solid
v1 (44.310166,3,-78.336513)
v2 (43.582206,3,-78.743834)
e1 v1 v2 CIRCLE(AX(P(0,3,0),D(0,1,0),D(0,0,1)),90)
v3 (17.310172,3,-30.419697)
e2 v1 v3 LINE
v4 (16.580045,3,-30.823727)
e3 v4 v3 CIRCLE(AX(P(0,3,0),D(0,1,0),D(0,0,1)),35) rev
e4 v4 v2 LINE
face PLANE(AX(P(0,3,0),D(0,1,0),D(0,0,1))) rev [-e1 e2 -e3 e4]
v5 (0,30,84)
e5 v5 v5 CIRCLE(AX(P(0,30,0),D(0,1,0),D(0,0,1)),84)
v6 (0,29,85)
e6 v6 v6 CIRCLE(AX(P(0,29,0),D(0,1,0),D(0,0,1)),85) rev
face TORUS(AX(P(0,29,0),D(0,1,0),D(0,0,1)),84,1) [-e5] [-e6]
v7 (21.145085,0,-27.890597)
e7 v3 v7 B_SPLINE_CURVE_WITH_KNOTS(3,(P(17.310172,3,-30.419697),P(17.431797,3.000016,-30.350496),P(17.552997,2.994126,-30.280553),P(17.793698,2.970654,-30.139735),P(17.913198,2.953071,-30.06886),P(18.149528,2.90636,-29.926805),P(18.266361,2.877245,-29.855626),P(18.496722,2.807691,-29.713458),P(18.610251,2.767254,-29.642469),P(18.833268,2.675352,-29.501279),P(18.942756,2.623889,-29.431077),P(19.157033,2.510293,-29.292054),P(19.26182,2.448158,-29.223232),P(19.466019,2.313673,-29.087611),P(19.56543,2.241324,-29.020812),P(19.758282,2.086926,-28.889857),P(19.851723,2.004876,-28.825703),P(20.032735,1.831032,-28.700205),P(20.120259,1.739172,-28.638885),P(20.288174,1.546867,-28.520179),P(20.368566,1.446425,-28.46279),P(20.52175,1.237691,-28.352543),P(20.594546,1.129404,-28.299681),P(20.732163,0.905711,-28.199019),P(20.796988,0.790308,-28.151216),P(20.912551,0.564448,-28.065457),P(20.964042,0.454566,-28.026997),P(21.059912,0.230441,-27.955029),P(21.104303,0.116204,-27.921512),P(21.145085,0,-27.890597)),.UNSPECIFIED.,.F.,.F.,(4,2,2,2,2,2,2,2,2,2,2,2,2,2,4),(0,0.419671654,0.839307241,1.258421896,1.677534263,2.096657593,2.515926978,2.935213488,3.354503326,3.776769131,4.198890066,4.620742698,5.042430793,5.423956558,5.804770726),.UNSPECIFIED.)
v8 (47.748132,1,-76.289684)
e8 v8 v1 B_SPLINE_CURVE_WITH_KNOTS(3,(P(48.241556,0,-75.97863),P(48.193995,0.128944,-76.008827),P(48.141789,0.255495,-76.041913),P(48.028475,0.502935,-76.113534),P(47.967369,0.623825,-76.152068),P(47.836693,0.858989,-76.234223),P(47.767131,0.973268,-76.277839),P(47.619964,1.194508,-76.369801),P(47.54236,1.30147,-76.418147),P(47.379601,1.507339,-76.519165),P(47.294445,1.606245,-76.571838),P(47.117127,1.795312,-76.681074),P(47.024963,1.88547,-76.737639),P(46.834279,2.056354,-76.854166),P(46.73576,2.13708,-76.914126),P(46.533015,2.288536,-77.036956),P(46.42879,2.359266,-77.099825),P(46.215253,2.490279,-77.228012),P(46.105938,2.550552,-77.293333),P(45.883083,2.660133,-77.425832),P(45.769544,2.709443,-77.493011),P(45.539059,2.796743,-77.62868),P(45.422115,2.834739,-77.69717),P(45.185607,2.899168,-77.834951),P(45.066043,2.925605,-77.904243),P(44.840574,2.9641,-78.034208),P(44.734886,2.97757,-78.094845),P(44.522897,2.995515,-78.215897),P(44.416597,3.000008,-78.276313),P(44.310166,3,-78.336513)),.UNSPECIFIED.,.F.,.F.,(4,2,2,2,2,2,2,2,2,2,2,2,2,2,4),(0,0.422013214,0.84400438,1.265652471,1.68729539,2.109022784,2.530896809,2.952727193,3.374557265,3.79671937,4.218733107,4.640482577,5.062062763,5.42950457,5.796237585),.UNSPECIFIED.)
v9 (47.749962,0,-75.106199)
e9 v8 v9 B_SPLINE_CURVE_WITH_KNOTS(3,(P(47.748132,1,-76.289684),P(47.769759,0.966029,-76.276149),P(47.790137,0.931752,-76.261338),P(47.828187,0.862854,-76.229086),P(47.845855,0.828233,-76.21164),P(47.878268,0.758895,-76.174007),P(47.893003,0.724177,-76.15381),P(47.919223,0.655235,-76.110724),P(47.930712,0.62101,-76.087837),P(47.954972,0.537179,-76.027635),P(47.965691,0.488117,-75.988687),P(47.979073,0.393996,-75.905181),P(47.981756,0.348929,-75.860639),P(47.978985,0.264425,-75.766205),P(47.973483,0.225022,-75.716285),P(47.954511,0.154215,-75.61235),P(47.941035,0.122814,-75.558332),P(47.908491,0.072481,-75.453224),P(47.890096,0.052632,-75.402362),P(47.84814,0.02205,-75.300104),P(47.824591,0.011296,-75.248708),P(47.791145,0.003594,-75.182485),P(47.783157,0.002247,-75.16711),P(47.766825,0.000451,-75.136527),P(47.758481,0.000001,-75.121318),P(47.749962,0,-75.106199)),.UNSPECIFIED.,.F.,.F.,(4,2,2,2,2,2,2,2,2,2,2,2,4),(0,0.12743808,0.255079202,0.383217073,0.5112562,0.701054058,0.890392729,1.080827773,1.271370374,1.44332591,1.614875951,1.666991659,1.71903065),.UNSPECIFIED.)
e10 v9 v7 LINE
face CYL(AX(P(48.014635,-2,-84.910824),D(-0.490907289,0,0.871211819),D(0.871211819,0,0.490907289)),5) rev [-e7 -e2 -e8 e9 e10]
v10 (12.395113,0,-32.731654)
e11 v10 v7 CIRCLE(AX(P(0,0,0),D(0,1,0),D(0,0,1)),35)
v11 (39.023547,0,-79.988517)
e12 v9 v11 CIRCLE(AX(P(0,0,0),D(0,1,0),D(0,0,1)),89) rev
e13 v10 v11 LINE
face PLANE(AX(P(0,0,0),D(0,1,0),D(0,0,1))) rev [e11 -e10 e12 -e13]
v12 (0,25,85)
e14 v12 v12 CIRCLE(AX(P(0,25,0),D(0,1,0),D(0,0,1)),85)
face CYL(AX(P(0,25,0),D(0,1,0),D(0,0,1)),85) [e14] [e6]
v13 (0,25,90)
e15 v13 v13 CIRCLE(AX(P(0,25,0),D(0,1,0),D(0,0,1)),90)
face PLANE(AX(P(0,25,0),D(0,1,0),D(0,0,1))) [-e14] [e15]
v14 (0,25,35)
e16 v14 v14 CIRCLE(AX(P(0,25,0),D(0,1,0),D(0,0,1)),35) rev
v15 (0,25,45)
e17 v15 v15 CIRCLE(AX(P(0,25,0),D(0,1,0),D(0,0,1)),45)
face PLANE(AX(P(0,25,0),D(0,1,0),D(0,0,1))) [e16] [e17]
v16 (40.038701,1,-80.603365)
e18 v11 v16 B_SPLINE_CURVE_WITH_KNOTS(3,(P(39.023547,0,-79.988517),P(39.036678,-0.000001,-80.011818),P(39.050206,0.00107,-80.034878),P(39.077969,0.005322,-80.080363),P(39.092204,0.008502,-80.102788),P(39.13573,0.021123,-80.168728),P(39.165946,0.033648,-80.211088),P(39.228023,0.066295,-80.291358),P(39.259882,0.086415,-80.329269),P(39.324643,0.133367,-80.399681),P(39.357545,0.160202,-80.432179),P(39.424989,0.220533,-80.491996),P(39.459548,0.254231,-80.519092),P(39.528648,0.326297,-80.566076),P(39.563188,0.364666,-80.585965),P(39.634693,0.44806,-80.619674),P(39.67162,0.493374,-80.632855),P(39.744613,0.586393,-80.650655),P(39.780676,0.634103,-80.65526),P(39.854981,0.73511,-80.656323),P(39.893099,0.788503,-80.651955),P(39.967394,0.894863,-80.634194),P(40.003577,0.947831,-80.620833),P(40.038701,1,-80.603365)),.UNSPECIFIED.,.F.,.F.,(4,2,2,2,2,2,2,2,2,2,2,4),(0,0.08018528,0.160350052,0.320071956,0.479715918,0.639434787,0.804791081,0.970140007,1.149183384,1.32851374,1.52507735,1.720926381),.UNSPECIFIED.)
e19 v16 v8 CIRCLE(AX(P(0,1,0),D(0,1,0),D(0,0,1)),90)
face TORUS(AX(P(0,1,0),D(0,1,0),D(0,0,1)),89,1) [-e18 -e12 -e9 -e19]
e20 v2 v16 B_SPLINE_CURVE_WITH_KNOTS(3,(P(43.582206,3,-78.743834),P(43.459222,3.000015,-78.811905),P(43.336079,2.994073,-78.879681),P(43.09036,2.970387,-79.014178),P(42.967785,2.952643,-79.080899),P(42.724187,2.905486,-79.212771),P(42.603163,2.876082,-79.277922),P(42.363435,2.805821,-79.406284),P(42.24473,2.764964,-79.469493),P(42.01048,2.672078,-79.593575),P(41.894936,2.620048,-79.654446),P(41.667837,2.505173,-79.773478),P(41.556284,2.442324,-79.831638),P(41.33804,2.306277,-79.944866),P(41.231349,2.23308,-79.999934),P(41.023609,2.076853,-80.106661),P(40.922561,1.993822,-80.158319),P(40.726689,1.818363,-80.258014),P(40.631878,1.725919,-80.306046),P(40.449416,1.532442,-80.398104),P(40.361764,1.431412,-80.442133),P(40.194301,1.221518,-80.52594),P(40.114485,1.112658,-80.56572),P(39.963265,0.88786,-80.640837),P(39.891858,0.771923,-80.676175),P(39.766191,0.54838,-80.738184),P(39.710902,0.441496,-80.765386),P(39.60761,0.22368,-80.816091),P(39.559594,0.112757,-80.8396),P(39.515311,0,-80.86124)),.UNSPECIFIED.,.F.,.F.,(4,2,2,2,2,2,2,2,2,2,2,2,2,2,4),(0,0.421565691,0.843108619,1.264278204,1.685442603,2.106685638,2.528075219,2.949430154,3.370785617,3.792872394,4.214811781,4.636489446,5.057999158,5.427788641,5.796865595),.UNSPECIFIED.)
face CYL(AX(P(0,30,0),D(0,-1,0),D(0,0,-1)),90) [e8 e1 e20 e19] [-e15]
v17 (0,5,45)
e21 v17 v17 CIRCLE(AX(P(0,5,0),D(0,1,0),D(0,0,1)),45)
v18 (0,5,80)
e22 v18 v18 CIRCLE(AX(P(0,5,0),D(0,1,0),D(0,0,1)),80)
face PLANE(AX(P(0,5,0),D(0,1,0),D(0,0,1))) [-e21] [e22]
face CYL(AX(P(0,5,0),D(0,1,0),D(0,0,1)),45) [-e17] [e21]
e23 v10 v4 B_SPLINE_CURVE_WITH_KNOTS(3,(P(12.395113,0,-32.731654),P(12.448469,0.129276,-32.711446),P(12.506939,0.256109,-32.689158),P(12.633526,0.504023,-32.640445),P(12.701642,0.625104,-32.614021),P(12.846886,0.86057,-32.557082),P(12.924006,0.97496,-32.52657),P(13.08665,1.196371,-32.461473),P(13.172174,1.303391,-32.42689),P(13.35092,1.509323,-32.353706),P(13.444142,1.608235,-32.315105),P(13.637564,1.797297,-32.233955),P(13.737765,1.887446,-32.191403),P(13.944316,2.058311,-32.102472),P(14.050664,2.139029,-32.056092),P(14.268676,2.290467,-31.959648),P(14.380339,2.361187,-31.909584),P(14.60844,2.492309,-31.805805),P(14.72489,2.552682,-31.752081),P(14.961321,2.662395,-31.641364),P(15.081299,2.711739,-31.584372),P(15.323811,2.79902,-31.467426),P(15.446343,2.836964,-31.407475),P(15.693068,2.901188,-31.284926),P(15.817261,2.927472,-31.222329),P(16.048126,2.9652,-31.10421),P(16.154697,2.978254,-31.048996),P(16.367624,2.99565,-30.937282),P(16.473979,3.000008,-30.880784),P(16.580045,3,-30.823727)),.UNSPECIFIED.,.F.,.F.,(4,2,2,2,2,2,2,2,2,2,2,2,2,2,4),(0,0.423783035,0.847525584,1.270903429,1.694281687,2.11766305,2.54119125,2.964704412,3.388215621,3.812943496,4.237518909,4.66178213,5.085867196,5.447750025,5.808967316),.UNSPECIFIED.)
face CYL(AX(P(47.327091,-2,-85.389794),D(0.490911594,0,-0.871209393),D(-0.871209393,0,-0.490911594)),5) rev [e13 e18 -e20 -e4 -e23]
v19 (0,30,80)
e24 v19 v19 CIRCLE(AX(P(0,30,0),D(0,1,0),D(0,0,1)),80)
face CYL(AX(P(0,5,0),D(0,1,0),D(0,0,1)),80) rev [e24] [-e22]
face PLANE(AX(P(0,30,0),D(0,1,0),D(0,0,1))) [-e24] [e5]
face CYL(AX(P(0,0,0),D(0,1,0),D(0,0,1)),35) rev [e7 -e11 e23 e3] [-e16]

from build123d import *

# Parameters (mm, degrees)
SKETCH1_R           = 90
BOSS_EXTRUDE1_DEPTH = 30
SKETCH2_R           = 80
SKETCH2_R_2         = 45
CUT_EXTRUDE2_DEPTH  = 25
SKETCH3_R           = 35
CUT_EXTRUDE3_DEPTH  = 30
CUT_EXTRUDE6_START  = -5
SKETCH4_R           = 90
SKETCH4_R_2         = 85
CUT_EXTRUDE6_DEPTH  = 5
CUT_EXTRUDE7_DEPTH  = 3
FILLET4_R           = 5
FILLET5_R           = 5
FILLET7_R           = 1
SKETCH8_R           = 45
CUT_EXTRUDE8_DEPTH  = 5


with BuildPart() as part:
    # Sketch1 → Boss-Extrude1 (new body)
    with BuildSketch(Plane(origin=(0, 0, 0), x_dir=(1, 0, 0), z_dir=(0, 1, 0))):
        with Locations(Location((0, 0, 0), (0, 0, 270))):
            Circle(SKETCH1_R)
    extrude(amount=BOSS_EXTRUDE1_DEPTH)

    # Sketch2 → Cut-Extrude2 (cut)
    with BuildSketch(Plane(origin=(0, 30, 0), x_dir=(1, 0, 0), z_dir=(0, 1, 0))):
        with Locations(Location((0, 0, 0), (0, 0, 270))):
            Circle(SKETCH2_R)
        with Locations(Location((0, 0, 0), (0, 0, 270))):
            Circle(SKETCH2_R_2, mode=Mode.SUBTRACT)
    extrude(amount=-CUT_EXTRUDE2_DEPTH, mode=Mode.SUBTRACT)

    # Sketch3 → Cut-Extrude3 (cut)
    with BuildSketch(Plane(origin=(0, 30, 0), x_dir=(1, 0, 0), z_dir=(0, 1, 0))):
        with Locations(Location((0, 0, 0), (0, 0, 270))):
            Circle(SKETCH3_R)
    extrude(amount=-CUT_EXTRUDE3_DEPTH, mode=Mode.SUBTRACT)

    # Sketch4 → Cut-Extrude6 (cut)
    with BuildSketch(Plane(origin=(0, 30, 0), x_dir=(1, 0, 0), z_dir=(0, 1, 0)).offset(CUT_EXTRUDE6_START)):
        with Locations(Location((0, 0, 0), (0, 0, 270))):
            Circle(SKETCH4_R)
        with Locations(Location((0, 0, 0), (0, 0, 270))):
            Circle(SKETCH4_R_2, mode=Mode.SUBTRACT)
    extrude(amount=CUT_EXTRUDE6_DEPTH, mode=Mode.SUBTRACT)

    # Sketch7 → Cut-Extrude7 (cut)
    with BuildSketch(Plane(origin=(0, 0, 0), x_dir=(-1, 0, 0), z_dir=(0, -1, 0))):
        Polygon((-43.33470773, 87.639434023), (16.290699143, -18.176389433), (7.60290089, -23.128375045), (-52.007029161, 82.661204336), align=None)
    extrude(amount=-CUT_EXTRUDE7_DEPTH, mode=Mode.SUBTRACT)

    # Fillet4
    # the kernel refuses this fillet: 5 mm, written as the material it adds along each edge
    with BuildSketch(Plane(origin=(15.521035458, 3, -17.909611373), x_dir=(0, -1, 0), z_dir=(0.490907288805725, 0, -0.871211819133219))) as fillet4_piece_1_section:
        with BuildLine():
            CenterArc((5, 4.582575695), FILLET4_R, 180, 66.421821522)
            Line((0, 4.582575695), (-0.1, 4.582575695))
            Line((-0.1, 4.582575695), (-0.1, 0))
            Line((-0.1, 0), (0, -0.1))
            ThreePointArc((0, -0.1), (1.5, -0.1), (2.96, -0.091651514))
            Line((2.96, -0.091651514), (3, 0))
        make_face()
    fillet4_piece_1 = extrude(amount=78.109596927, mode=Mode.PRIVATE)
    fillet4_piece_1 = fillet4_piece_1 & Plane(origin=(0, 3, 0), x_dir=(0, 0, 1), z_dir=(0, -1, 0)) * Cylinder(90, 175, mode=Mode.PRIVATE)
    fillet4_piece_1 = fillet4_piece_1 - Plane(origin=(0, 3, 0), x_dir=(0, 0, 1), z_dir=(0, 1, 0)) * Cylinder(35, 175, mode=Mode.PRIVATE)
    add(fillet4_piece_1)

    # Fillet5
    # the kernel refuses this fillet: 5 mm, written as the material it adds along each edge
    with BuildSketch(Plane(origin=(45.139410265, 3, -90.842197657), x_dir=(0.8712093933197586, 0, 0.4909115938653498), z_dir=(-0.4909115938653499, 0, 0.8712093933197586))) as fillet5_piece_1_section:
        with BuildLine():
            CenterArc((4.582575695, -5), FILLET5_R, 90, 66.421821522)
            Line((0, -3), (-0.091651514, -2.96))
            ThreePointArc((-0.091651514, -2.96), (-0.1, -1.5), (-0.1, 0))
            Line((-0.1, 0), (0, 0.1))
            Line((0, 0.1), (4.582575695, 0.1))
            Line((4.582575695, 0.1), (4.582575695, 0))
        make_face()
    fillet5_piece_1 = extrude(amount=78.15744592, mode=Mode.PRIVATE)
    fillet5_piece_1 = fillet5_piece_1 - Plane(origin=(0, 3, 0), x_dir=(0, 0, 1), z_dir=(0, 1, 0)) * Cylinder(35, 175, mode=Mode.PRIVATE)
    fillet5_piece_1 = fillet5_piece_1 & Plane(origin=(0, 3, 0), x_dir=(0, 0, 1), z_dir=(0, -1, 0)) * Cylinder(90, 175, mode=Mode.PRIVATE)
    add(fillet5_piece_1)

    # Fillet6: read off the stored shape, not the designer's step
    # Fillet6 outline → Fillet6 (revolve, cut)
    with BuildSketch(Plane.XY):
        with BuildLine():
            ThreePointArc((90, 1), (89.707106781, 0.292893219), (89, 0))
            Line((89, 0), (90, 0))
            Line((90, 0), (90, 1))
        make_face()
    revolve(axis=Axis((0, 0, 0), (0, 1, 0)), mode=Mode.SUBTRACT)

    # Fillet7
    fillet7_edges = [part.edges().sort_by_distance(p)[0] for p in [
        (0, 30, -85),
    ]]
    fillet(fillet7_edges, radius=FILLET7_R)

    # Sketch8 → Cut-Extrude8 (cut)
    with BuildSketch(Plane(origin=(0, 30, 0), x_dir=(1, 0, 0), z_dir=(0, 1, 0))):
        with Locations(Location((0, 0, 0), (0, 0, 270))):
            Circle(SKETCH8_R)
    extrude(amount=-CUT_EXTRUDE8_DEPTH, mode=Mode.SUBTRACT)


solid = part.part
